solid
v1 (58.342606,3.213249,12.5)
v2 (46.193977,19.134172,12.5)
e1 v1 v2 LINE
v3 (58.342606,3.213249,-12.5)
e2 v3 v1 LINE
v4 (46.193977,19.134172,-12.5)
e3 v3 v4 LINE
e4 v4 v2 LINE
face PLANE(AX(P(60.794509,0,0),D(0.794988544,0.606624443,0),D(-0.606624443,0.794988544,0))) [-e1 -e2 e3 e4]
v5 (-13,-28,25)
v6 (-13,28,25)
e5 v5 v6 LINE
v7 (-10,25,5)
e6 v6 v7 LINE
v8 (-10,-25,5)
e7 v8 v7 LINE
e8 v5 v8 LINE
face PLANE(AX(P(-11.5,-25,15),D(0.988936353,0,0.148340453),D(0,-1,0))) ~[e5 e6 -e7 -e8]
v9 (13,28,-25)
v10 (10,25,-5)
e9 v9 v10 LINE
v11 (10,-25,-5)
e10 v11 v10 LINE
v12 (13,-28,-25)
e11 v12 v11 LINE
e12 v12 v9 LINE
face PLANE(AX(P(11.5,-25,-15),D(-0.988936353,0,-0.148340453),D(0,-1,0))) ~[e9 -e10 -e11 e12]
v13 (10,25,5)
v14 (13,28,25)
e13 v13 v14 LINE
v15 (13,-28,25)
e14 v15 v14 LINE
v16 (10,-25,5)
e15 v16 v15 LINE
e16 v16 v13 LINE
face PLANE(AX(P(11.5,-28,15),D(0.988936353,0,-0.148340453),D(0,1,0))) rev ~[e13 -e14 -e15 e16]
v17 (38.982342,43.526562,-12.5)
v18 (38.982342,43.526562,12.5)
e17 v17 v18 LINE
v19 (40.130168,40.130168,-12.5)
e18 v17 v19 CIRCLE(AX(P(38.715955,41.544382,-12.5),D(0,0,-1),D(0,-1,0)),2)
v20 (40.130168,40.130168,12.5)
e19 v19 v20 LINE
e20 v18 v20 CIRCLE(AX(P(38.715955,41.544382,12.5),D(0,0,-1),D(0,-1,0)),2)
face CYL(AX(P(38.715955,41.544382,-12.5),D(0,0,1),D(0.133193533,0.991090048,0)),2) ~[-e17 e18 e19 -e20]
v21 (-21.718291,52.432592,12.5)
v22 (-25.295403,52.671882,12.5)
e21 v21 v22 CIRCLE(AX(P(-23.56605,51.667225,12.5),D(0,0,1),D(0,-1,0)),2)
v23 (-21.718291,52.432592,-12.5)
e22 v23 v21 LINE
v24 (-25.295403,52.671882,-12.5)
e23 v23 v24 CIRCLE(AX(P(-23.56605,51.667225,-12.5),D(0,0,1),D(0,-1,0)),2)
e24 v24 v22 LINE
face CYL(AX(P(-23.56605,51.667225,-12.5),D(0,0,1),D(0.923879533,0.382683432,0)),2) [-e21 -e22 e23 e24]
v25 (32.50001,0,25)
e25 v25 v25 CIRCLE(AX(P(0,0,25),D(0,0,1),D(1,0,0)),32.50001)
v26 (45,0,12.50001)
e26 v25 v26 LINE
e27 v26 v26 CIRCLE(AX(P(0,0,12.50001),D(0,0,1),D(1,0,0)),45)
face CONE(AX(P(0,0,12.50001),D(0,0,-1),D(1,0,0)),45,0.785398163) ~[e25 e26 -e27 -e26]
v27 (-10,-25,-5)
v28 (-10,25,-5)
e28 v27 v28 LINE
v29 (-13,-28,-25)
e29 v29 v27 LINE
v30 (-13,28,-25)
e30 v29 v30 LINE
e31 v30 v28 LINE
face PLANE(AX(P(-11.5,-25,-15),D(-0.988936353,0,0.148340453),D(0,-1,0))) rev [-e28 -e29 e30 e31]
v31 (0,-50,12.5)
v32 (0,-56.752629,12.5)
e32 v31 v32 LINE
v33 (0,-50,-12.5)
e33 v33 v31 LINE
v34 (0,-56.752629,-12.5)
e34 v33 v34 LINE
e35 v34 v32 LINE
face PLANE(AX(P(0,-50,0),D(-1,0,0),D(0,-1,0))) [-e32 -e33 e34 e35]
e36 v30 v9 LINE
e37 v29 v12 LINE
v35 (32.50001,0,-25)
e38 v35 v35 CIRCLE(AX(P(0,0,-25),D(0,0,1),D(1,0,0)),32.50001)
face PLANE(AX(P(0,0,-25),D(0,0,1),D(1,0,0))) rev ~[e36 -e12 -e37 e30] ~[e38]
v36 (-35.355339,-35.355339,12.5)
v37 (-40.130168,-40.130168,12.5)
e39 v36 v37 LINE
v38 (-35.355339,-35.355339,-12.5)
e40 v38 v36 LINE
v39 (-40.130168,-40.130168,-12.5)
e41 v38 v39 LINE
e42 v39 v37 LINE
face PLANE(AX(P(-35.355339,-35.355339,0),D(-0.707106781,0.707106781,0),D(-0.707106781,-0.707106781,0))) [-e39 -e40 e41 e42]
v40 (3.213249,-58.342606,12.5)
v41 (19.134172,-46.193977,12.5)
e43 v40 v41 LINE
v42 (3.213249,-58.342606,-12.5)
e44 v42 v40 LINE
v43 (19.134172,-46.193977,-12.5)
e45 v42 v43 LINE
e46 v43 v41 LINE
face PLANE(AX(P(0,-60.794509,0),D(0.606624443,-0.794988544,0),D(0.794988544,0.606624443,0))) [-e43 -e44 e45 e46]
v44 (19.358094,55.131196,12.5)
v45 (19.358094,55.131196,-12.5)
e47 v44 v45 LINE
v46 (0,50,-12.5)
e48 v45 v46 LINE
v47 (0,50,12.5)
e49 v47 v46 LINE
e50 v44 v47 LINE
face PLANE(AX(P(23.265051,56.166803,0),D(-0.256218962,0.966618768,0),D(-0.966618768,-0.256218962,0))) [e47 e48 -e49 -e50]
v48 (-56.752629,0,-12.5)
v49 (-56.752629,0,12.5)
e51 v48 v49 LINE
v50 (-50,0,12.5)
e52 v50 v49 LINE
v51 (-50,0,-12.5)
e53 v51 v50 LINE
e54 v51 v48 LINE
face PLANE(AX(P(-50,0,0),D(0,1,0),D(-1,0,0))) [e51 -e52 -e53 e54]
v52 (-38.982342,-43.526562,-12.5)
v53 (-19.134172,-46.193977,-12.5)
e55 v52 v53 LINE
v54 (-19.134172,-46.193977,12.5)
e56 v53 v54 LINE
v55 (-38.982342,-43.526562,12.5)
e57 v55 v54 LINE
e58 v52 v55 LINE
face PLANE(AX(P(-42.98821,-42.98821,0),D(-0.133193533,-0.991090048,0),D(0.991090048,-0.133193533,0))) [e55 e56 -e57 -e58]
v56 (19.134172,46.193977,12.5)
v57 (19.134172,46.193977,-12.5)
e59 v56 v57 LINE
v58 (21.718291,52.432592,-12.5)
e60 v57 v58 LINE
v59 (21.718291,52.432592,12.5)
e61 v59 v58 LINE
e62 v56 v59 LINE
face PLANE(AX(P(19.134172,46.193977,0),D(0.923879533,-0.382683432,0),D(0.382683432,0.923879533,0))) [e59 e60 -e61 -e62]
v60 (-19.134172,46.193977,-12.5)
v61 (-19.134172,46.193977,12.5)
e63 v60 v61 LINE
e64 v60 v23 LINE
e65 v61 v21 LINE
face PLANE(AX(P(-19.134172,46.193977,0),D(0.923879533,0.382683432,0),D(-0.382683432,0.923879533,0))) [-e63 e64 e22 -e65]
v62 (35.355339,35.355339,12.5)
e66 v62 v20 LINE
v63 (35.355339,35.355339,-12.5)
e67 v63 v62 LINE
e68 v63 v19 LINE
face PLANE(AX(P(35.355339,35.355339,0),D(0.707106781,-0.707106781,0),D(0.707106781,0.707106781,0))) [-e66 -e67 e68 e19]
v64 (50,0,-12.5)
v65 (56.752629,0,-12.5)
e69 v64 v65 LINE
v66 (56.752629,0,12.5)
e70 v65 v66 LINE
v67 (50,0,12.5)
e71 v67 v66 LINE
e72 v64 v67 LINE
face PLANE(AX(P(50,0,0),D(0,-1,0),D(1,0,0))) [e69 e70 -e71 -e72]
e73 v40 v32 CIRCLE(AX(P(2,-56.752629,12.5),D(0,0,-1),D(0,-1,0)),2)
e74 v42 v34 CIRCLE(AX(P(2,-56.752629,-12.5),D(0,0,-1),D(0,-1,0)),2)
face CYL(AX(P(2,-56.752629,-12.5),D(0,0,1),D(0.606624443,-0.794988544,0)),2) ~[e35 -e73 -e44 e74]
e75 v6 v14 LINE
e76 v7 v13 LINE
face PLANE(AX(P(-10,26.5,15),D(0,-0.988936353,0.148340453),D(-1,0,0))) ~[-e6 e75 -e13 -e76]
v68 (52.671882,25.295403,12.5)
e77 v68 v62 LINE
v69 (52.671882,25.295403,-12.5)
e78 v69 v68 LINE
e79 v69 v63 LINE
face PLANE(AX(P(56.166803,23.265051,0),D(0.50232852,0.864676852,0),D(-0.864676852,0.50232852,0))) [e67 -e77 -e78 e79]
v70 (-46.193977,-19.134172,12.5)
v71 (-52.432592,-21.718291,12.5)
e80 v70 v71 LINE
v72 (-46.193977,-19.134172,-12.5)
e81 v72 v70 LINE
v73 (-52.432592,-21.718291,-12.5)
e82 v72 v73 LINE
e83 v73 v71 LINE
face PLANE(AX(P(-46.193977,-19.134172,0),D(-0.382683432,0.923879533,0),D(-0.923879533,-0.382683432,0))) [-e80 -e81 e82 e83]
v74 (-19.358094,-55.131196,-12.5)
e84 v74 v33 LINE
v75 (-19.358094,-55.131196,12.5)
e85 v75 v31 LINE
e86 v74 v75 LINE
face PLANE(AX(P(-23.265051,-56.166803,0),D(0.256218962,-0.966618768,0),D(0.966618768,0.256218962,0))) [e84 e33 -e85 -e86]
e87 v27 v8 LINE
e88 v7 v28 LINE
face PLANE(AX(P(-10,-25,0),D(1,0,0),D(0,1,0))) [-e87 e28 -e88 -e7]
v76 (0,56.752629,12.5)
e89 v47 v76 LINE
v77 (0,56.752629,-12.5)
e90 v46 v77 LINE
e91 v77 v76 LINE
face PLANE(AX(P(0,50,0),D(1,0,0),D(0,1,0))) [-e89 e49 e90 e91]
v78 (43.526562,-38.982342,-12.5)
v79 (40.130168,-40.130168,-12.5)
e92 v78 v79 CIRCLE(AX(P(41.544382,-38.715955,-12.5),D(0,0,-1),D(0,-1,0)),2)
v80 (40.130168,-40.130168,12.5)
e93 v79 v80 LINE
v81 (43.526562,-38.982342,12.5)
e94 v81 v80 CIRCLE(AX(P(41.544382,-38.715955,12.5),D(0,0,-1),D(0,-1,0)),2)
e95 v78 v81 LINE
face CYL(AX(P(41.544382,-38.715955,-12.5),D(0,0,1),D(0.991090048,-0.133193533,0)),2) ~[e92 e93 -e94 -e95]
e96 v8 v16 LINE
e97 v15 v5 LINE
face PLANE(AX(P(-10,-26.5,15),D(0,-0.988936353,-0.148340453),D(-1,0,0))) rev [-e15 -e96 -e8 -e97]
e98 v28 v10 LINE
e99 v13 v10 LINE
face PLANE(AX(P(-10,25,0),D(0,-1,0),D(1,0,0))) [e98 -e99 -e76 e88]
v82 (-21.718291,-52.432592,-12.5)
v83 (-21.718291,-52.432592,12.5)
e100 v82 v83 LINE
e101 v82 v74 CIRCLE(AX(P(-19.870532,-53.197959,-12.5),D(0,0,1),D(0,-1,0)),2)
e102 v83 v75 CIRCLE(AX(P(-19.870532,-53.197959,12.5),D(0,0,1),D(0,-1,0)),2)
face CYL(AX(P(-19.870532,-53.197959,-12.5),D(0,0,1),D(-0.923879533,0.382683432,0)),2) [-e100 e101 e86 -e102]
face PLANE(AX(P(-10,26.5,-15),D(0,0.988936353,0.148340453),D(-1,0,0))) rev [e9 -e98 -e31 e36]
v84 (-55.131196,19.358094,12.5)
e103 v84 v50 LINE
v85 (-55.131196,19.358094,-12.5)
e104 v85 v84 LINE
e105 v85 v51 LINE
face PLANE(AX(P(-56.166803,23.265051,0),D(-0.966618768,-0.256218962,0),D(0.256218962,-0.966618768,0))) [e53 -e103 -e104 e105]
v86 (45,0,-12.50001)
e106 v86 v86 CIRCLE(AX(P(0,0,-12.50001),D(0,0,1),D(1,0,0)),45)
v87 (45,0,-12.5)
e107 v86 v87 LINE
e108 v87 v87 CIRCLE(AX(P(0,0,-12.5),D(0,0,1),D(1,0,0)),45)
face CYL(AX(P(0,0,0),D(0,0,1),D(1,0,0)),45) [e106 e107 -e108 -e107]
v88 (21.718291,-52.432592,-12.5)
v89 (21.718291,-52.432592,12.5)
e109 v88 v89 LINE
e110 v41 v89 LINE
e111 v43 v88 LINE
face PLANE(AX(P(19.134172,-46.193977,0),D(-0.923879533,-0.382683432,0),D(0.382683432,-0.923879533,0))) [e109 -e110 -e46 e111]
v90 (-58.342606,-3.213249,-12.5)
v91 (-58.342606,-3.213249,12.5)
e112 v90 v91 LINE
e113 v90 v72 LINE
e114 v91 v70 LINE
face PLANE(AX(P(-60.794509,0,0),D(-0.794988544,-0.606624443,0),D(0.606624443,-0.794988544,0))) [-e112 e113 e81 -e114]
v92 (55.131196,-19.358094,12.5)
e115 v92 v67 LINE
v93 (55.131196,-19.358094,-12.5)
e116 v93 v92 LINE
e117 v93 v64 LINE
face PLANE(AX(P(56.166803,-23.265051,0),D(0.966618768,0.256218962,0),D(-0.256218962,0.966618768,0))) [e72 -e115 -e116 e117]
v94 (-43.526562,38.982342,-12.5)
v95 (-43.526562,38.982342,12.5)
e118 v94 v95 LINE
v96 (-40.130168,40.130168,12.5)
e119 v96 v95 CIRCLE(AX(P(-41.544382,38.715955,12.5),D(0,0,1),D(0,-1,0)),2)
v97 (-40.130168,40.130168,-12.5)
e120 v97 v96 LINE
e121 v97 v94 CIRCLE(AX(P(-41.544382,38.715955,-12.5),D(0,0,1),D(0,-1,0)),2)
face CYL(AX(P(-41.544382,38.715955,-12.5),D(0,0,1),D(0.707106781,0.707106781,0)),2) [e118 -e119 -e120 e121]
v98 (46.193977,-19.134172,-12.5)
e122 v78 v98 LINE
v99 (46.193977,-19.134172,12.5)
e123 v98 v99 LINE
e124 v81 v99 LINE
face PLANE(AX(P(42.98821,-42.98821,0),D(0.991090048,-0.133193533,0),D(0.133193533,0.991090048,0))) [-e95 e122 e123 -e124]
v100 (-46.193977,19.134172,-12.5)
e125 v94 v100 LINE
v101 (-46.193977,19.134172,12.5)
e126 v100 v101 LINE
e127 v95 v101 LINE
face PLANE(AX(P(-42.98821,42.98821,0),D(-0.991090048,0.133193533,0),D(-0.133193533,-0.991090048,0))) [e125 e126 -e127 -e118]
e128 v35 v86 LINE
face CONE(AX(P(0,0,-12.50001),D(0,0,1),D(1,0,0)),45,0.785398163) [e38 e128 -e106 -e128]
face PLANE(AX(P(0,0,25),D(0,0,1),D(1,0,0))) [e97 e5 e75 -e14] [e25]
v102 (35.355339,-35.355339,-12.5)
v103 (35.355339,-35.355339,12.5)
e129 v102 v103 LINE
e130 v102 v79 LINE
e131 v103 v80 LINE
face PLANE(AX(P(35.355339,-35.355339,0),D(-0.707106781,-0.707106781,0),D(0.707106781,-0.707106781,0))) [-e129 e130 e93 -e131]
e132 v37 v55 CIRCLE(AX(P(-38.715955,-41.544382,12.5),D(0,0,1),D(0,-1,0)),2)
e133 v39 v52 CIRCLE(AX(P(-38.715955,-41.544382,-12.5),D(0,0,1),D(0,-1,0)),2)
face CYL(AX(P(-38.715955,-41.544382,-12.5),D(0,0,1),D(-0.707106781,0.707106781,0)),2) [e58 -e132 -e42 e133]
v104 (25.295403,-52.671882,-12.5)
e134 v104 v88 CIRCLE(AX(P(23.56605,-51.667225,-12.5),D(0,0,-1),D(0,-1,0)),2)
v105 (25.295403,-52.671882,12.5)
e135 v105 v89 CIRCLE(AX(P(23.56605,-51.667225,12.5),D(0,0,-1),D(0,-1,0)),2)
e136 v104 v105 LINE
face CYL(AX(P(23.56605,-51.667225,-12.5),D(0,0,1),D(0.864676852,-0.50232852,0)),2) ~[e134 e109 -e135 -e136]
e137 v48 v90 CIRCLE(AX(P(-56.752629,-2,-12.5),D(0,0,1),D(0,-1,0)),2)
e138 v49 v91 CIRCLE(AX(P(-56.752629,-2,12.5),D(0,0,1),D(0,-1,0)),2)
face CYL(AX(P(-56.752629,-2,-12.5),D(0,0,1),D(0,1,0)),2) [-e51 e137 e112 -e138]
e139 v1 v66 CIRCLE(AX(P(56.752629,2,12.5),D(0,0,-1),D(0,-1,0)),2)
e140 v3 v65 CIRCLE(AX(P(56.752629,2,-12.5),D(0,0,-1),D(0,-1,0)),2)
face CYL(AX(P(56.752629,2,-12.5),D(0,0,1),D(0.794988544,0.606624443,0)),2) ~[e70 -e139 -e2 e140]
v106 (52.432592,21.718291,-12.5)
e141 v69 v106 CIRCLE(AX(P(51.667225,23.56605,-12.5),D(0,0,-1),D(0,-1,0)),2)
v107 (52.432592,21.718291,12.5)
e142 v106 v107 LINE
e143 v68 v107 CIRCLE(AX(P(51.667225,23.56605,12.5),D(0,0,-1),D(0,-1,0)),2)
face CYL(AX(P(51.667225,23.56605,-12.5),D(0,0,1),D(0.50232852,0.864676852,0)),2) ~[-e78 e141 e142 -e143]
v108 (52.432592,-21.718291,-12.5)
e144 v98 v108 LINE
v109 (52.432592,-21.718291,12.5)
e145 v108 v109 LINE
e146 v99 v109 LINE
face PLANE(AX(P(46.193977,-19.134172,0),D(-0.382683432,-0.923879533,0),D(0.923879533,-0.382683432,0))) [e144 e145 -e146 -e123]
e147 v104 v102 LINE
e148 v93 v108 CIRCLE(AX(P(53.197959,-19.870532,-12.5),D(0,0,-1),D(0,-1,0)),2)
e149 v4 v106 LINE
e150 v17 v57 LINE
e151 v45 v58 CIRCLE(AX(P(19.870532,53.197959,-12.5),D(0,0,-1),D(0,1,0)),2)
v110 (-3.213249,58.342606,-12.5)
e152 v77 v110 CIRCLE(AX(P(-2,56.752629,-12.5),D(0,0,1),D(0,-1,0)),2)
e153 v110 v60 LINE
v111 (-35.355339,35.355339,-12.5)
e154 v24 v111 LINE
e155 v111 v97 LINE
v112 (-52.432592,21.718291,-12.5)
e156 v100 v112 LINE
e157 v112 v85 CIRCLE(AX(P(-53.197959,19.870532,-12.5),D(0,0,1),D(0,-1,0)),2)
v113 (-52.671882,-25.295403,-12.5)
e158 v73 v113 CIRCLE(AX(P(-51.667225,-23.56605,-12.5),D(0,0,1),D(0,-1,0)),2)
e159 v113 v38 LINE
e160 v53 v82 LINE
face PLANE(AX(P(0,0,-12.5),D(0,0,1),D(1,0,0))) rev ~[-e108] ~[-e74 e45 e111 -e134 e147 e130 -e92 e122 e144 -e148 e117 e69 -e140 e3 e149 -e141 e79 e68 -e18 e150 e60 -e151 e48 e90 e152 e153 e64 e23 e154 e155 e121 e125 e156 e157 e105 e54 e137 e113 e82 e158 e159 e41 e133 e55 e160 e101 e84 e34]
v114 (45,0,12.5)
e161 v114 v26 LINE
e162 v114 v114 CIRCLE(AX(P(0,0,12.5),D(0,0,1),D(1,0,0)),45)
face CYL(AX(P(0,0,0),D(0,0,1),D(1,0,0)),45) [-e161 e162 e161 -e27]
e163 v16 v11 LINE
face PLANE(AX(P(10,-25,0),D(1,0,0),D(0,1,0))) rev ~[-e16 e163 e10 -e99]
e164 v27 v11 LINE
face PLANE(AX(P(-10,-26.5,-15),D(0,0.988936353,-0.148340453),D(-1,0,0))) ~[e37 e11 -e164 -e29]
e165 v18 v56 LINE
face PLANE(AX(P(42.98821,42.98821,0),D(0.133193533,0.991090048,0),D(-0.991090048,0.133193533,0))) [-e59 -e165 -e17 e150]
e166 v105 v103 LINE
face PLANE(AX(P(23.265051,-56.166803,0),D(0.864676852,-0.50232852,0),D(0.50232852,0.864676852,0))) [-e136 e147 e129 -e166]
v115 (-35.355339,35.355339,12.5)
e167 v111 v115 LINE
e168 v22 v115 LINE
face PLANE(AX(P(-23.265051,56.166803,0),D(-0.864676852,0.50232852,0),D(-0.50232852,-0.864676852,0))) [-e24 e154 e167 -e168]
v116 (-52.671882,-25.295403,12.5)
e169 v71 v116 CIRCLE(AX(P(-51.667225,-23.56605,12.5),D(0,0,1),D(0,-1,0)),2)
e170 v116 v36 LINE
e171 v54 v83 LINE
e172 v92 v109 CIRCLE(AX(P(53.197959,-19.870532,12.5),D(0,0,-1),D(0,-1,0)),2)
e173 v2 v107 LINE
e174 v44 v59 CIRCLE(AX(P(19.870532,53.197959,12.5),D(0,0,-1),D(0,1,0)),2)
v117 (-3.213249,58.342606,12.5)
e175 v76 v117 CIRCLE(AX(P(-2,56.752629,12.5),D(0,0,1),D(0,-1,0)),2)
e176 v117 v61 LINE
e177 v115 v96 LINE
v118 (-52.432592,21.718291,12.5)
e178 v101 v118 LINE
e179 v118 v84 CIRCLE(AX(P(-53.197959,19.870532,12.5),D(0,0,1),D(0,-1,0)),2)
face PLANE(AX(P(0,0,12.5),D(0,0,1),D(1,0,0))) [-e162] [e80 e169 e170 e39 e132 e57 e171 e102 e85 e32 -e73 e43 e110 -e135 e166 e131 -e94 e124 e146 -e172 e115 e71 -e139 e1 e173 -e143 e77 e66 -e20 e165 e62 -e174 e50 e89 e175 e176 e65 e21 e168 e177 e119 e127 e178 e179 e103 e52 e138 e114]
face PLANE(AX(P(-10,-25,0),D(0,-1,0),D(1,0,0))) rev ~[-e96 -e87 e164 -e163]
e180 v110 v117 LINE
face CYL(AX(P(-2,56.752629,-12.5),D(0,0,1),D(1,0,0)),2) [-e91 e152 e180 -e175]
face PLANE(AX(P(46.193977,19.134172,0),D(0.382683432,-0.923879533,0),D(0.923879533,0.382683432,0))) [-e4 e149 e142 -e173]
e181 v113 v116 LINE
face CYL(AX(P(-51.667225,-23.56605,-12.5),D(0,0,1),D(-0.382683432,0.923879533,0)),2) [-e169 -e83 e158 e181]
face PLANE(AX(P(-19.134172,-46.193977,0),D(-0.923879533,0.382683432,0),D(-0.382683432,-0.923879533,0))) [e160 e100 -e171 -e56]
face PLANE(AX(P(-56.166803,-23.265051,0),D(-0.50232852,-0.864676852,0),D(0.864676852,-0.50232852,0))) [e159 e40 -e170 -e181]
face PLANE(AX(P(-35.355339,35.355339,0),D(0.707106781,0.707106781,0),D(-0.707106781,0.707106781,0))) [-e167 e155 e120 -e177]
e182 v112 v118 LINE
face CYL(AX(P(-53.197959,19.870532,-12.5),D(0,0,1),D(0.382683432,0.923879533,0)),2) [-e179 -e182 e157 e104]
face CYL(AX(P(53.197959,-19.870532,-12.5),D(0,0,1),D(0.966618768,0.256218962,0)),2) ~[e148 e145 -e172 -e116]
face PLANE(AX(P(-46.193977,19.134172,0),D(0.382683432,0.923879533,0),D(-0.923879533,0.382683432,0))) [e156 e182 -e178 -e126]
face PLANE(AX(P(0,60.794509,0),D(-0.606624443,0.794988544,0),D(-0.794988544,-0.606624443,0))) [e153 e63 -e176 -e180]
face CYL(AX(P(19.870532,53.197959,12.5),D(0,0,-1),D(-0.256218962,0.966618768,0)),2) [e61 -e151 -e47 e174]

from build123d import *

# Parameters (mm, degrees)
F0_R       = 45
F0_W       = 20
F0_H       = 50
F1_DEPTH   = 12.5
F2_DEPTH   = 25
F3_SIZE2   = 12.49999
F3_SIZE    = 12.49999
F4_SIZE    = 12.49999
F5_R       = 2
F6_SIZE2   = 20
F6_SIZE    = 3
F6_2_SIZE2 = 20
F6_2_SIZE  = 3
F7_SIZE2   = 3
F7_SIZE    = 20


# Not quite as in the source:
# - a fillet or chamfer is up to 0.001 mm smaller than in the source, because OpenCascade refuses the exact size


with BuildPart() as f1:
    # F0 (on Top) → F1 (new body, symmetric)
    with BuildSketch(Plane.XY):
        Polygon((46.1939766256, -19.1341716183), (50, 0), (46.1939766256, 19.1341716183), (35.3553390593, 35.3553390593), (19.1341716183, 46.1939766256), (0, 50), (-19.1341716183, 46.1939766256), (-35.3553390593, 35.3553390593), (-46.1939766256, 19.1341716183), (-50, 0), (-46.1939766256, -19.1341716183), (-35.3553390593, -35.3553390593), (-19.1341716183, -46.1939766256), (0, -50), (19.1341716183, -46.1939766256), (35.3553390593, -35.3553390593), align=None)
        Circle(F0_R, mode=Mode.SUBTRACT)
        Circle(F0_R)
        Rectangle(F0_W, F0_H, mode=Mode.SUBTRACT)
        Polygon((-19.1341716183, 46.1939766256), (0, 50), (0, 60.7945092961), align=None)
        Polygon((-35.3553390593, 35.3553390593), (-19.1341716183, 46.1939766256), (-23.2650514864, 56.1668028277), align=None)
        Polygon((-46.1939766256, 19.1341716183), (-35.3553390593, 35.3553390593), (-42.9882097822, 42.9882097822), align=None)
        Polygon((-50, 0), (-46.1939766256, 19.1341716183), (-56.1668028277, 23.2650514864), align=None)
        Polygon((-60.7945092961, 0), (-46.1939766256, -19.1341716183), (-50, 0), align=None)
        Polygon((-56.1668028277, -23.2650514864), (-35.3553390593, -35.3553390593), (-46.1939766256, -19.1341716183), align=None)
        Polygon((-42.9882097822, -42.9882097822), (-19.1341716183, -46.1939766256), (-35.3553390593, -35.3553390593), align=None)
        Polygon((-23.2650514864, -56.1668028277), (0, -50), (-19.1341716183, -46.1939766256), align=None)
        Polygon((0, -60.7945092961), (19.1341716183, -46.1939766256), (0, -50), align=None)
        Polygon((23.2650514864, -56.1668028277), (35.3553390593, -35.3553390593), (19.1341716183, -46.1939766256), align=None)
        Polygon((42.9882097822, -42.9882097822), (46.1939766256, -19.1341716183), (35.3553390593, -35.3553390593), align=None)
        Polygon((56.1668028277, -23.2650514864), (50, 0), (46.1939766256, -19.1341716183), align=None)
        Polygon((46.1939766256, 19.1341716183), (50, 0), (60.7945092961, 0), align=None)
        Polygon((35.3553390593, 35.3553390593), (46.1939766256, 19.1341716183), (56.1668028277, 23.2650514864), align=None)
        Polygon((19.1341716183, 46.1939766256), (35.3553390593, 35.3553390593), (42.9882097822, 42.9882097822), align=None)
        Polygon((0, 50), (19.1341716183, 46.1939766256), (23.2650514864, 56.1668028277), align=None)
    extrude(amount=F1_DEPTH, both=True)

    # F0 (on Top) → F2 (join, symmetric)
    with BuildSketch(Plane.XY):
        Circle(F0_R)
        Rectangle(F0_W, F0_H, mode=Mode.SUBTRACT)
    extrude(amount=F2_DEPTH, both=True)

    # F3 (size 12.5 and 12.5 in the source; OpenCascade refuses exactly that, so slightly less here)
    f3_edges = [f1.edges().sort_by_distance(p)[0] for p in [
        (-45, 0, 25),
    ]]
    chamfer(f3_edges, length=F3_SIZE, length2=F3_SIZE2)

    # F4 (size 12.5 in the source; OpenCascade refuses exactly that, so slightly less here)
    f4_edges = [f1.edges().sort_by_distance(p)[0] for p in [
        (-45, 0, -25),
    ]]
    chamfer(f4_edges, length=F4_SIZE)

    # F5
    f5_edges = [f1.edges().sort_by_distance(p)[0] for p in [
        (23.265051, 56.166803, 0),
        (0, 60.794509, 0),
        (-23.265051, 56.166803, 0),
        (-42.98821, 42.98821, 0),
        (-56.166803, 23.265051, 0),
        (-60.794509, 0, 0),
        (-56.166803, -23.265051, 0),
        (-42.98821, -42.98821, 0),
        (-23.265051, -56.166803, 0),
        (0, -60.794509, 0),
        (23.265051, -56.166803, 0),
        (42.98821, 42.98821, 0),
        (56.166803, 23.265051, 0),
        (60.794509, 0, 0),
        (56.166803, -23.265051, 0),
        (42.98821, -42.98821, 0),
    ]]
    fillet(f5_edges, radius=F5_R)

    # F6
    f6_edges = [f1.edges().sort_by_distance(p)[0] for p in [
        (0, 25, -25),
        (-10, 0, -25),
        (10, 0, -25),
        (0, -25, -25),
    ]]
    f6_side = f1.faces().sort_by_distance((-31.580771, 0, -25))[0]
    chamfer(f6_edges, length=F6_SIZE, length2=F6_SIZE2, reference=f6_side)

    # F6#2
    f6_2_edges = [f1.edges().sort_by_distance(p)[0] for p in [
        (-10, 0, 25),
        (0, -25, 25),
        (0, 25, 25),
    ]]
    f6_2_side = f1.faces().sort_by_distance((-31.580771, 0, 25))[0]
    chamfer(f6_2_edges, length=F6_2_SIZE, length2=F6_2_SIZE2, reference=f6_2_side)

    # F7
    f7_edges = [f1.edges().sort_by_distance(p)[0] for p in [
        (10, 0, 25),
    ]]
    f7_side = f1.faces().sort_by_distance((10, 0, 10.320513))[0]
    chamfer(f7_edges, length=F7_SIZE, length2=F7_SIZE2, reference=f7_side)


solid = f1.part
